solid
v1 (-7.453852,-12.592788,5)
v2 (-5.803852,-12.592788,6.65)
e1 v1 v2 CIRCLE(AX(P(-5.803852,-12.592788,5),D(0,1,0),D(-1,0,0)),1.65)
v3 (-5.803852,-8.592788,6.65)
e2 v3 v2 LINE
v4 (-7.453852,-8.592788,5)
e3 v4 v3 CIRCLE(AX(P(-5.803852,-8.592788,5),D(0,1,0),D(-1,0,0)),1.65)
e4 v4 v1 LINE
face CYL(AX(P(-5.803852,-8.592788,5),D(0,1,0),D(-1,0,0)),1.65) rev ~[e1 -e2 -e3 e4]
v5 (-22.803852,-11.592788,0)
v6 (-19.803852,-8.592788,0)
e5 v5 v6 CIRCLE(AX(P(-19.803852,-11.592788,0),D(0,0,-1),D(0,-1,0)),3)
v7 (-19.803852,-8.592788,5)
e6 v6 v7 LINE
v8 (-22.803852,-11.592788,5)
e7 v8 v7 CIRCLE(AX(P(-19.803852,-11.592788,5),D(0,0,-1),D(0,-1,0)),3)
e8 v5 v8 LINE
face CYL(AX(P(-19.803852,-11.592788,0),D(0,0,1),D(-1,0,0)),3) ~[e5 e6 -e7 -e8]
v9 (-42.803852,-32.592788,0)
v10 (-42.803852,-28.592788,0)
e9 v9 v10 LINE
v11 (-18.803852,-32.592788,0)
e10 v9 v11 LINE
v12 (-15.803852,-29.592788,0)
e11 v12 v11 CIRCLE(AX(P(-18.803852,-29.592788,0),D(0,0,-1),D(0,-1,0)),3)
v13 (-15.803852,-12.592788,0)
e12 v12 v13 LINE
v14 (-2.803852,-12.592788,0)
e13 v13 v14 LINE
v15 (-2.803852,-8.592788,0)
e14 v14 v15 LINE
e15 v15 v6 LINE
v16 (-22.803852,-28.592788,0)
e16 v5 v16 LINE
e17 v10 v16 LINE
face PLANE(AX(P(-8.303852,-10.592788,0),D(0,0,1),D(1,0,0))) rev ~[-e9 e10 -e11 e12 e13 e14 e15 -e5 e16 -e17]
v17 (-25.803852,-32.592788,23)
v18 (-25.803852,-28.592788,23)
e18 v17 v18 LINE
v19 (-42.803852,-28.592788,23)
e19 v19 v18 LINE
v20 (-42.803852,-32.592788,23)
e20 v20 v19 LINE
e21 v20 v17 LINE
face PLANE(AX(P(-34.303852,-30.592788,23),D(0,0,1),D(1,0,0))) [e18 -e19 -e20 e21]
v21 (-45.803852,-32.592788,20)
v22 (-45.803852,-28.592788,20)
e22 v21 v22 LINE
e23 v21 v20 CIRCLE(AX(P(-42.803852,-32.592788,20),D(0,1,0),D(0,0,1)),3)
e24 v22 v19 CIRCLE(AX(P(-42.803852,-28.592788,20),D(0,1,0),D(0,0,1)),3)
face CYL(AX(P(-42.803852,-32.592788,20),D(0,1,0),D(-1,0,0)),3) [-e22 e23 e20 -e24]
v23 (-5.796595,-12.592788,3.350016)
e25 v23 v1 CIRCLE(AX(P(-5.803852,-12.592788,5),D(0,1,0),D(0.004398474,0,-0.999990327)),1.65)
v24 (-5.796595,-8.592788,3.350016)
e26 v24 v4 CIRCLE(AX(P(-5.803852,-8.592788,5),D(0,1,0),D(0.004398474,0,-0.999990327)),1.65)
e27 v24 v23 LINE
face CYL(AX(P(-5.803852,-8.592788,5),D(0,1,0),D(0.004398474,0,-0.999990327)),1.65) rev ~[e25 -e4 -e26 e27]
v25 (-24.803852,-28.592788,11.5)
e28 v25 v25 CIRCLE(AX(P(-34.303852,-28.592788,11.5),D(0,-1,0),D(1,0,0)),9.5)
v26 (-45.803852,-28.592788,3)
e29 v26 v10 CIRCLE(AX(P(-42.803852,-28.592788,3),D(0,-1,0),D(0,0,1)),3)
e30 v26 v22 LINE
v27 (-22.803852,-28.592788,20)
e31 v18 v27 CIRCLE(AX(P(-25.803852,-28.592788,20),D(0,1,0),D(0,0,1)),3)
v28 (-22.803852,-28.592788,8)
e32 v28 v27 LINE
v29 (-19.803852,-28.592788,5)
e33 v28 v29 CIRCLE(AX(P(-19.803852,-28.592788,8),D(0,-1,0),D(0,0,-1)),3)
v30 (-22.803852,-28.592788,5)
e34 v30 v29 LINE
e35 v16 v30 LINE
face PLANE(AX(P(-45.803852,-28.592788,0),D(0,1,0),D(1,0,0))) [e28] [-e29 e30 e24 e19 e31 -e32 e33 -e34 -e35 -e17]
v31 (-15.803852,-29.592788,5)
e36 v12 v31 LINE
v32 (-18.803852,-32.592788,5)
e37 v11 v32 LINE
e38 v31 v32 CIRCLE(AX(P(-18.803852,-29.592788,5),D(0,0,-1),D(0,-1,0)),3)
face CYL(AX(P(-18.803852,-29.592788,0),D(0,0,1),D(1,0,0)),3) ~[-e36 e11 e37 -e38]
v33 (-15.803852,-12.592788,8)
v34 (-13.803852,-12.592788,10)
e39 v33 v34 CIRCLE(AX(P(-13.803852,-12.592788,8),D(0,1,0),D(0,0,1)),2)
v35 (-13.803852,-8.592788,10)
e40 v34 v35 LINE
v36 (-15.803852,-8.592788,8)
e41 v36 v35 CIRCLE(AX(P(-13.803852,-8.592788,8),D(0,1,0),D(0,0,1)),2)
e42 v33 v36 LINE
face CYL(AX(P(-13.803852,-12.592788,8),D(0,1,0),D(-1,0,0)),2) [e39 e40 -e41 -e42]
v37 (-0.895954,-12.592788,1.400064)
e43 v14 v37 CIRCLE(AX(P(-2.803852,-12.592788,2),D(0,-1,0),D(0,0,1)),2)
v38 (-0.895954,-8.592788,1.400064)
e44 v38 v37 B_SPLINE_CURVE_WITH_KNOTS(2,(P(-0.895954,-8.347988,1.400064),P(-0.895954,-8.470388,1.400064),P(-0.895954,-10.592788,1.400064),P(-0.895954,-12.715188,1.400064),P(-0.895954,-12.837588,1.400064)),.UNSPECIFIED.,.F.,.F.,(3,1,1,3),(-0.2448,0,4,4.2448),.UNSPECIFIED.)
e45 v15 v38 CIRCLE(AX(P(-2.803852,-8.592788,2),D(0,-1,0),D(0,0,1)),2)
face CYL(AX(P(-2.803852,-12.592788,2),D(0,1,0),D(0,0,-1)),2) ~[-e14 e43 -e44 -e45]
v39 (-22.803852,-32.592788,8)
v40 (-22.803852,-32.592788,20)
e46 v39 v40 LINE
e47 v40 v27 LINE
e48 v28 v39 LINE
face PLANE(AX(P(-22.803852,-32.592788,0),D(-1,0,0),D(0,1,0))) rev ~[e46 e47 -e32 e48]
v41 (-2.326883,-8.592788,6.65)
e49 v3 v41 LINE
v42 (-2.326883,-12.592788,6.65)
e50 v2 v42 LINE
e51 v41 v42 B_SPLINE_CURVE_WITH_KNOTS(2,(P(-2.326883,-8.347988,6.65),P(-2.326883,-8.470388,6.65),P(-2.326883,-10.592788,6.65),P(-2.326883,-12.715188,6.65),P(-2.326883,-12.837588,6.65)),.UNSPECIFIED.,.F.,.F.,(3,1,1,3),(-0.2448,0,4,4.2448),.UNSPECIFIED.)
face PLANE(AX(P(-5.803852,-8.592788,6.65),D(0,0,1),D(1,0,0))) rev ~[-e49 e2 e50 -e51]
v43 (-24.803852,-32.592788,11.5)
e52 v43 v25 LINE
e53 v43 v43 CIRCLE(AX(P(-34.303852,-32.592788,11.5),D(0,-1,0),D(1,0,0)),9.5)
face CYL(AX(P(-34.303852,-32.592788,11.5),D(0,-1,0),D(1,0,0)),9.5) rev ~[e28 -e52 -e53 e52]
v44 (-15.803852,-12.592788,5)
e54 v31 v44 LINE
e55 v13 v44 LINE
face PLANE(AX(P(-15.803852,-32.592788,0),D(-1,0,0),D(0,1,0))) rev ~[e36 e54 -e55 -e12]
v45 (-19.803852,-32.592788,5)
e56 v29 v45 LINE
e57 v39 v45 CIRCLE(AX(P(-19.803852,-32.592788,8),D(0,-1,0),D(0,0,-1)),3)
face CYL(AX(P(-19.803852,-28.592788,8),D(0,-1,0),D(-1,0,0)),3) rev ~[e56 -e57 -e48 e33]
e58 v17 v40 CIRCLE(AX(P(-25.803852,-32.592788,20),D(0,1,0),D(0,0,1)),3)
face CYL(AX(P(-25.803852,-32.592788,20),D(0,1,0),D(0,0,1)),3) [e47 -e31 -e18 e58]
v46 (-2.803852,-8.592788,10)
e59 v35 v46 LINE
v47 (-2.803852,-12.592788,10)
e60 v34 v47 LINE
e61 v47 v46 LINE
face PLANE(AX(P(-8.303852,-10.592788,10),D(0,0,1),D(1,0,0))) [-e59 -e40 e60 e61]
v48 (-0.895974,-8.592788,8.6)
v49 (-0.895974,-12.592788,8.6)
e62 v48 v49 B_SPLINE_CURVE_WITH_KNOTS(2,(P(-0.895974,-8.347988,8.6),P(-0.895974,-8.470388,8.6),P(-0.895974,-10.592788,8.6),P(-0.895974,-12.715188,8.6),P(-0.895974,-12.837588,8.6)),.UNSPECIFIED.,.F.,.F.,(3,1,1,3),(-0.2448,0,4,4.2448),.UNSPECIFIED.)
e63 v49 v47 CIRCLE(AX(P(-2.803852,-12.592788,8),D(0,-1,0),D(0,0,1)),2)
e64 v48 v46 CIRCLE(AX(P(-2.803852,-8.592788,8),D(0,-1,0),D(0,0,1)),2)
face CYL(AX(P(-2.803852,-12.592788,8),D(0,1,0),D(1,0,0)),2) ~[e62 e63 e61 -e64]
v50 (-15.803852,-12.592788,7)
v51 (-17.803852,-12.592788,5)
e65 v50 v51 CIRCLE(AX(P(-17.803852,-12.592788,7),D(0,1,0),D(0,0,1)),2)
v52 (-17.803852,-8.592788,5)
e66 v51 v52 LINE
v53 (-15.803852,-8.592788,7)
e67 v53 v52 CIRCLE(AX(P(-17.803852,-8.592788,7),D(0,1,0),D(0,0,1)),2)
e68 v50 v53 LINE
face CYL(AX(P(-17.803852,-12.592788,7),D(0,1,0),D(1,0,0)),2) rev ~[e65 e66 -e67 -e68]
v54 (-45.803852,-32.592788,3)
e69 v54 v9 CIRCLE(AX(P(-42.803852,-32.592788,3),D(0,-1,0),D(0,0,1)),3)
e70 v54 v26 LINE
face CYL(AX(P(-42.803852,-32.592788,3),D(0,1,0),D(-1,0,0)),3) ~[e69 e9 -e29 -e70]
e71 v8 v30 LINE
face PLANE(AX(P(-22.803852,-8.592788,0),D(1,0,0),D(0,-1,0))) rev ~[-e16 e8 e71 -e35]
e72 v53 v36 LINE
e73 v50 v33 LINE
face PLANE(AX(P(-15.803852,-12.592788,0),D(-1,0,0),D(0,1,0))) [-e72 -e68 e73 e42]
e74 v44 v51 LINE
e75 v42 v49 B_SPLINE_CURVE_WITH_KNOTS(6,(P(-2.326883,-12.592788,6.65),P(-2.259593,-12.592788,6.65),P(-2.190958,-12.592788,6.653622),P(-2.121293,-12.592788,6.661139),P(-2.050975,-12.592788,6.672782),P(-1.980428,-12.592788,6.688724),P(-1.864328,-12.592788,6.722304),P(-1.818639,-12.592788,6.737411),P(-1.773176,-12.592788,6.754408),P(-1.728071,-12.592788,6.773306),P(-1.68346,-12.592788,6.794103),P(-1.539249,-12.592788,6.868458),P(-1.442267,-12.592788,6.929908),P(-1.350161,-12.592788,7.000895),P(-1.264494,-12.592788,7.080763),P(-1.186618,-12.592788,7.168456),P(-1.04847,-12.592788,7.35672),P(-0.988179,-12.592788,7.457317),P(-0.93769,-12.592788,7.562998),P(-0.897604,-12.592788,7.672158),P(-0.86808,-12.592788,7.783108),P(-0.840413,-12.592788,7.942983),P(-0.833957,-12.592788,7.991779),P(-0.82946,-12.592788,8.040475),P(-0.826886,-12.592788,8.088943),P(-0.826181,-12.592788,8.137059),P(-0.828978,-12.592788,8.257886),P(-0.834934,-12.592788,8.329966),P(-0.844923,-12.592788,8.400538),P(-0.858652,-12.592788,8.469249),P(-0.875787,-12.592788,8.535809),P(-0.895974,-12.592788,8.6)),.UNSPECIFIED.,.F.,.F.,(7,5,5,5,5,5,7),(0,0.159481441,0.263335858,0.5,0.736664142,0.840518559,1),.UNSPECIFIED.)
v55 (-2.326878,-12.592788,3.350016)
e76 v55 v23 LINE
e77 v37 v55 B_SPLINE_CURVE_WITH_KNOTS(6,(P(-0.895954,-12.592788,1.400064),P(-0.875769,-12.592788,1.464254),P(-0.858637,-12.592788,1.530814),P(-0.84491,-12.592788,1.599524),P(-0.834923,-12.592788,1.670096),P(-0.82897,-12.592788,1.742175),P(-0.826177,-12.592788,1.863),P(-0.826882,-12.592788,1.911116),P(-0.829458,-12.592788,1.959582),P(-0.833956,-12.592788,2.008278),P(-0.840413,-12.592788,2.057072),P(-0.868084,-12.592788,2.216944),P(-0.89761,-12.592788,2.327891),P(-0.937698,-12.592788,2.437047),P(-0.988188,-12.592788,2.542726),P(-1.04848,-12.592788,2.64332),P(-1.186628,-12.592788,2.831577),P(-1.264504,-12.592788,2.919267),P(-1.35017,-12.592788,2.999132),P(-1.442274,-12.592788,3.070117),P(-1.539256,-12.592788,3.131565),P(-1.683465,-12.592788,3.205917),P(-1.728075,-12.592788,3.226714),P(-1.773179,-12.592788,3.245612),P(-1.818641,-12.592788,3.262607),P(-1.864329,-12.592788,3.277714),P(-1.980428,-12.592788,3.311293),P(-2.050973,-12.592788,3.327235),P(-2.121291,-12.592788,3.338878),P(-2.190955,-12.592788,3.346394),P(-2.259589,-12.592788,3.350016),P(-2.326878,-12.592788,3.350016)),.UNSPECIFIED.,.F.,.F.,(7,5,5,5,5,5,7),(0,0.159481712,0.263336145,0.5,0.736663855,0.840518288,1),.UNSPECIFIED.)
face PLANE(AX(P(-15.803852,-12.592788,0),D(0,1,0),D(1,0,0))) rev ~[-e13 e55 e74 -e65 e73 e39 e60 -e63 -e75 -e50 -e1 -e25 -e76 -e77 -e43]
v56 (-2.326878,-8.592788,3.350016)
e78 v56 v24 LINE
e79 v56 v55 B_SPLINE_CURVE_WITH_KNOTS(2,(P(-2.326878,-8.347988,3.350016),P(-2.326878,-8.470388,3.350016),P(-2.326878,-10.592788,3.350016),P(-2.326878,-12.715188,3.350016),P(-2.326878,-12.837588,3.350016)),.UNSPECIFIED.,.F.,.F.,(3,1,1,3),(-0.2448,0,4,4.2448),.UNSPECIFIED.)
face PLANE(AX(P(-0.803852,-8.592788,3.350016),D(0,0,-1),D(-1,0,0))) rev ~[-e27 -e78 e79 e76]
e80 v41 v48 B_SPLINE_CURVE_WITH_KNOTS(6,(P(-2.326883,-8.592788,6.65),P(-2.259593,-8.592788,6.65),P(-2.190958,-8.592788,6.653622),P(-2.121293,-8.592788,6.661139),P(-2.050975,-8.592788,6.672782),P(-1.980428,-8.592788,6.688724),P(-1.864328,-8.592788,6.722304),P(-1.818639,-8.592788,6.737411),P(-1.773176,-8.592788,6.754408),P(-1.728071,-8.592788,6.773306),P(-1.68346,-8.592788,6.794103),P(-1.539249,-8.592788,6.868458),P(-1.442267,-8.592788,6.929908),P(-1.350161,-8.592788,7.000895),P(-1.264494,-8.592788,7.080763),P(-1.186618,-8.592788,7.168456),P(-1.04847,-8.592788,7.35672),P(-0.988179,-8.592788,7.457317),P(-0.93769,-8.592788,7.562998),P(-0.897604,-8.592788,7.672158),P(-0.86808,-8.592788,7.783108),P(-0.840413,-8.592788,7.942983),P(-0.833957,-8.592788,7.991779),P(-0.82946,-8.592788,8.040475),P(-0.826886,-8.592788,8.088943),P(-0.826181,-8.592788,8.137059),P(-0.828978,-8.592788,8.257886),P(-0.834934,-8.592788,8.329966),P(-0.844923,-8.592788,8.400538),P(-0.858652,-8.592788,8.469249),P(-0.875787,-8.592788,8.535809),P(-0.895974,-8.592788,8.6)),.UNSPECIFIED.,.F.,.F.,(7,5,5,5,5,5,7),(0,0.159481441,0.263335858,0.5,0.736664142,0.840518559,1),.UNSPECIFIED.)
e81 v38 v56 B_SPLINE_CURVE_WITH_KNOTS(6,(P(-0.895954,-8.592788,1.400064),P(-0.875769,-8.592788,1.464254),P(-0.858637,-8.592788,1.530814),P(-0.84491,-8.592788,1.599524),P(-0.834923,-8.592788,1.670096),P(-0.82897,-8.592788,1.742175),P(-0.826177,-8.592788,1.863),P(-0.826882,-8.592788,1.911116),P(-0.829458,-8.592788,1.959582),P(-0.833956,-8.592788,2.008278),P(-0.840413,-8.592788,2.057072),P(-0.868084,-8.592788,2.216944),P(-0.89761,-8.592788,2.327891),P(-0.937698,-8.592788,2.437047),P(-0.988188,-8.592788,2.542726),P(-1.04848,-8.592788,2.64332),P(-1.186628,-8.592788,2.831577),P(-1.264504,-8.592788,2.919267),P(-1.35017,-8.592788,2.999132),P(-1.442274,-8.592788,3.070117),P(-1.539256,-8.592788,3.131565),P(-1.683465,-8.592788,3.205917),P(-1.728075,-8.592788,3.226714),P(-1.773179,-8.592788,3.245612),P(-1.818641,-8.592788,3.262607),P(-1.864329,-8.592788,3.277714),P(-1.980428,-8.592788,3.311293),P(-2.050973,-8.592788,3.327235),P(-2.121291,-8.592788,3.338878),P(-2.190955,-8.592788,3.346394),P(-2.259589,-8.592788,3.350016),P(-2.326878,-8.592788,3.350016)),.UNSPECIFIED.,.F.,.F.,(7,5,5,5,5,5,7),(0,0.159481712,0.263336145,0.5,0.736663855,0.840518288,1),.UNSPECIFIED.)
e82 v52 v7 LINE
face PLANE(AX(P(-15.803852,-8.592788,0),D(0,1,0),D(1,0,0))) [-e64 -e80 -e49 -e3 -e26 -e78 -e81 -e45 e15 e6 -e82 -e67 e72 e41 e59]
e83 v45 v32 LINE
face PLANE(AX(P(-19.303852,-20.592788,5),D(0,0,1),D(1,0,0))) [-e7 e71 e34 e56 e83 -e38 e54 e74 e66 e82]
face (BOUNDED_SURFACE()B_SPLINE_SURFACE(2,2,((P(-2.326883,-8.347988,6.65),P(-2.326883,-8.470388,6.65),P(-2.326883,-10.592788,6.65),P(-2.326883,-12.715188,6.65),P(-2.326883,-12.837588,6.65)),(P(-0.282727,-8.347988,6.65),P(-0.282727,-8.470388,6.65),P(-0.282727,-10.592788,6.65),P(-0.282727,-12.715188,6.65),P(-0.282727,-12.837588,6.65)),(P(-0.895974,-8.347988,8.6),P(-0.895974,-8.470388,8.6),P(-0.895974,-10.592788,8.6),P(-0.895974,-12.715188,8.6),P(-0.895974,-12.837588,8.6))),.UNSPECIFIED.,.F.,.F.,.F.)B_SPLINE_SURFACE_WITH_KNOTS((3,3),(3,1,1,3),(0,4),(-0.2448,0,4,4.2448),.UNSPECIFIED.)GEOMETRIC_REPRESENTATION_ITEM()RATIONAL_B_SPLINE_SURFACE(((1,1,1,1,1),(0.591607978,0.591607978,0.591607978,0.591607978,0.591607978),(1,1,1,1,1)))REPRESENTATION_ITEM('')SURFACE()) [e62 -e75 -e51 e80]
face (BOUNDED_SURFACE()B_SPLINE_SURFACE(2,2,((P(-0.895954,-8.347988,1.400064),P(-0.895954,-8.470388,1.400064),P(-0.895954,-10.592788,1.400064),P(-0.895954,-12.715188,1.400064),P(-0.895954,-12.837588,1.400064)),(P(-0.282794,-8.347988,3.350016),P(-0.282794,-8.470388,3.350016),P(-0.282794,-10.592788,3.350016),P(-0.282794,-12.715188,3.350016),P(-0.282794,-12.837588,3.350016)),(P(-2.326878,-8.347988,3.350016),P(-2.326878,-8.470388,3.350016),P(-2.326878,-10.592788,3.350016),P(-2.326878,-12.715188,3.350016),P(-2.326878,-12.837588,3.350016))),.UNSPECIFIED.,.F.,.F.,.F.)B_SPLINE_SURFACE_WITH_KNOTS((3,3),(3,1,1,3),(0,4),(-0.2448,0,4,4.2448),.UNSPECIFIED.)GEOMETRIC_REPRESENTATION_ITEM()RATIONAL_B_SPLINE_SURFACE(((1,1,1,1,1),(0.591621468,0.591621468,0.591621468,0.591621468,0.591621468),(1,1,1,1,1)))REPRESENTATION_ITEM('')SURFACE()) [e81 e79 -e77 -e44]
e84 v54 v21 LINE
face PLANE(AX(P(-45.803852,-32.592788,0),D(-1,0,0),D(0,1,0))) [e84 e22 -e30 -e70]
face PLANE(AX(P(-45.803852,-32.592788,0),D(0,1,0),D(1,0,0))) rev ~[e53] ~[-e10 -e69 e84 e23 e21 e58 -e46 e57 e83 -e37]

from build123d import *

# Parameters (mm, degrees)
F1_DEPTH  = 5
F0_W      = 23
F0_H      = 4
F2_DEPTH  = 23
F4_R      = 3
F3_R      = 9.5
F5_DEPTH  = 25
F0_W_2    = 15
F6_DEPTH  = 10
F7_R      = 2
F9_DEPTH  = 25
F10_DEPTH = 25
F11_R     = 1.5


with BuildPart() as f1:
    # F0 (on Top) → F1 (new body)
    with BuildSketch(Plane.XY):
        Polygon((-15.8038523793, -12.5927883387), (-15.8038523793, -8.5927883387), (-22.8038523793, -8.5927883387), (-22.8038523793, -28.5927883387), (-22.8038523793, -32.5927883387), (-15.8038523793, -32.5927883387), align=None)
    extrude(amount=F1_DEPTH)

    # F0 (on Top) → F2 (join)
    with BuildSketch(Plane.XY):
        with Locations((-34.3038523793, -30.5927883387)):
            Rectangle(F0_W, F0_H)
    extrude(amount=F2_DEPTH)

    # F4
    f4_edges = [f1.edges().sort_by_distance(p)[0] for p in [
        (-22.803852, -30.592788, 5),
        (-22.803852, -30.592788, 23),
        (-45.803852, -30.592788, 23),
        (-45.803852, -30.592788, 0),
        (-22.803852, -8.592788, 2.5),
        (-15.803852, -32.592788, 2.5),
    ]]
    fillet(f4_edges, radius=F4_R)

    # F3 (on face) → F5 (cut)
    with BuildSketch(Plane.XZ.offset(32.5927883387)):
        with Locations((-34.3038523793, 11.5)):
            Circle(F3_R)
    extrude(amount=-F5_DEPTH, mode=Mode.SUBTRACT)

    # F0 (on Top) → F6 (join)
    with BuildSketch(Plane.XY):
        with Locations((-8.3038523793, -10.5927883387)):
            Rectangle(F0_W_2, F0_H)
    extrude(amount=F6_DEPTH)

    # F7
    f7_edges = [f1.edges().sort_by_distance(p)[0] for p in [
        (-15.803852, -10.592788, 5),
        (-15.803852, -10.592788, 10),
        (-0.803852, -10.592788, 10),
        (-0.803852, -10.592788, 0),
    ]]
    fillet(f7_edges, radius=F7_R)

    # F8 (on face) → F9 (cut)
    with BuildSketch(Plane(origin=(0, -8.5927883387, 0), x_dir=(-1, 0, 0), z_dir=(0, 1, 0))):
        with BuildLine():
            ThreePointArc((5.7965948978, 3.350015961), (6.9680098333, 3.8307107192), (7.4538523793, 5))
            ThreePointArc((7.4538523793, 5), (6.9705785683, 6.166726189), (5.8038523793, 6.65))
            ThreePointArc((5.8038523793, 6.65), (4.1538563696, 5.0036287496), (5.7965948978, 3.350015961))
        make_face()
    extrude(amount=-F9_DEPTH, mode=Mode.SUBTRACT)

    # F8 (on face) → F10 (cut)
    with BuildSketch(Plane(origin=(0, -8.5927883387, 0), x_dir=(-1, 0, 0), z_dir=(0, 1, 0))):
        with BuildLine():
            ThreePointArc((5.7965948978, 3.350015961), (4.1538563696, 5.0036287496), (5.8038523793, 6.65))
            Line((5.8038523793, 6.65), (0.8038523793, 6.65))
            Line((0.8038523793, 6.65), (0.8038523793, 3.350015961))
            Line((0.8038523793, 3.350015961), (5.7965948978, 3.350015961))
        make_face()
    extrude(amount=-F10_DEPTH, mode=Mode.SUBTRACT)

    # F11
    f11_edges = [f1.edges().sort_by_distance(p)[0] for p in [
        (-0.803852, -10.592788, 3.350016),
        (-0.803852, -10.592788, 6.65),
    ]]
    fillet(f11_edges, radius=F11_R)


solid = f1.part
